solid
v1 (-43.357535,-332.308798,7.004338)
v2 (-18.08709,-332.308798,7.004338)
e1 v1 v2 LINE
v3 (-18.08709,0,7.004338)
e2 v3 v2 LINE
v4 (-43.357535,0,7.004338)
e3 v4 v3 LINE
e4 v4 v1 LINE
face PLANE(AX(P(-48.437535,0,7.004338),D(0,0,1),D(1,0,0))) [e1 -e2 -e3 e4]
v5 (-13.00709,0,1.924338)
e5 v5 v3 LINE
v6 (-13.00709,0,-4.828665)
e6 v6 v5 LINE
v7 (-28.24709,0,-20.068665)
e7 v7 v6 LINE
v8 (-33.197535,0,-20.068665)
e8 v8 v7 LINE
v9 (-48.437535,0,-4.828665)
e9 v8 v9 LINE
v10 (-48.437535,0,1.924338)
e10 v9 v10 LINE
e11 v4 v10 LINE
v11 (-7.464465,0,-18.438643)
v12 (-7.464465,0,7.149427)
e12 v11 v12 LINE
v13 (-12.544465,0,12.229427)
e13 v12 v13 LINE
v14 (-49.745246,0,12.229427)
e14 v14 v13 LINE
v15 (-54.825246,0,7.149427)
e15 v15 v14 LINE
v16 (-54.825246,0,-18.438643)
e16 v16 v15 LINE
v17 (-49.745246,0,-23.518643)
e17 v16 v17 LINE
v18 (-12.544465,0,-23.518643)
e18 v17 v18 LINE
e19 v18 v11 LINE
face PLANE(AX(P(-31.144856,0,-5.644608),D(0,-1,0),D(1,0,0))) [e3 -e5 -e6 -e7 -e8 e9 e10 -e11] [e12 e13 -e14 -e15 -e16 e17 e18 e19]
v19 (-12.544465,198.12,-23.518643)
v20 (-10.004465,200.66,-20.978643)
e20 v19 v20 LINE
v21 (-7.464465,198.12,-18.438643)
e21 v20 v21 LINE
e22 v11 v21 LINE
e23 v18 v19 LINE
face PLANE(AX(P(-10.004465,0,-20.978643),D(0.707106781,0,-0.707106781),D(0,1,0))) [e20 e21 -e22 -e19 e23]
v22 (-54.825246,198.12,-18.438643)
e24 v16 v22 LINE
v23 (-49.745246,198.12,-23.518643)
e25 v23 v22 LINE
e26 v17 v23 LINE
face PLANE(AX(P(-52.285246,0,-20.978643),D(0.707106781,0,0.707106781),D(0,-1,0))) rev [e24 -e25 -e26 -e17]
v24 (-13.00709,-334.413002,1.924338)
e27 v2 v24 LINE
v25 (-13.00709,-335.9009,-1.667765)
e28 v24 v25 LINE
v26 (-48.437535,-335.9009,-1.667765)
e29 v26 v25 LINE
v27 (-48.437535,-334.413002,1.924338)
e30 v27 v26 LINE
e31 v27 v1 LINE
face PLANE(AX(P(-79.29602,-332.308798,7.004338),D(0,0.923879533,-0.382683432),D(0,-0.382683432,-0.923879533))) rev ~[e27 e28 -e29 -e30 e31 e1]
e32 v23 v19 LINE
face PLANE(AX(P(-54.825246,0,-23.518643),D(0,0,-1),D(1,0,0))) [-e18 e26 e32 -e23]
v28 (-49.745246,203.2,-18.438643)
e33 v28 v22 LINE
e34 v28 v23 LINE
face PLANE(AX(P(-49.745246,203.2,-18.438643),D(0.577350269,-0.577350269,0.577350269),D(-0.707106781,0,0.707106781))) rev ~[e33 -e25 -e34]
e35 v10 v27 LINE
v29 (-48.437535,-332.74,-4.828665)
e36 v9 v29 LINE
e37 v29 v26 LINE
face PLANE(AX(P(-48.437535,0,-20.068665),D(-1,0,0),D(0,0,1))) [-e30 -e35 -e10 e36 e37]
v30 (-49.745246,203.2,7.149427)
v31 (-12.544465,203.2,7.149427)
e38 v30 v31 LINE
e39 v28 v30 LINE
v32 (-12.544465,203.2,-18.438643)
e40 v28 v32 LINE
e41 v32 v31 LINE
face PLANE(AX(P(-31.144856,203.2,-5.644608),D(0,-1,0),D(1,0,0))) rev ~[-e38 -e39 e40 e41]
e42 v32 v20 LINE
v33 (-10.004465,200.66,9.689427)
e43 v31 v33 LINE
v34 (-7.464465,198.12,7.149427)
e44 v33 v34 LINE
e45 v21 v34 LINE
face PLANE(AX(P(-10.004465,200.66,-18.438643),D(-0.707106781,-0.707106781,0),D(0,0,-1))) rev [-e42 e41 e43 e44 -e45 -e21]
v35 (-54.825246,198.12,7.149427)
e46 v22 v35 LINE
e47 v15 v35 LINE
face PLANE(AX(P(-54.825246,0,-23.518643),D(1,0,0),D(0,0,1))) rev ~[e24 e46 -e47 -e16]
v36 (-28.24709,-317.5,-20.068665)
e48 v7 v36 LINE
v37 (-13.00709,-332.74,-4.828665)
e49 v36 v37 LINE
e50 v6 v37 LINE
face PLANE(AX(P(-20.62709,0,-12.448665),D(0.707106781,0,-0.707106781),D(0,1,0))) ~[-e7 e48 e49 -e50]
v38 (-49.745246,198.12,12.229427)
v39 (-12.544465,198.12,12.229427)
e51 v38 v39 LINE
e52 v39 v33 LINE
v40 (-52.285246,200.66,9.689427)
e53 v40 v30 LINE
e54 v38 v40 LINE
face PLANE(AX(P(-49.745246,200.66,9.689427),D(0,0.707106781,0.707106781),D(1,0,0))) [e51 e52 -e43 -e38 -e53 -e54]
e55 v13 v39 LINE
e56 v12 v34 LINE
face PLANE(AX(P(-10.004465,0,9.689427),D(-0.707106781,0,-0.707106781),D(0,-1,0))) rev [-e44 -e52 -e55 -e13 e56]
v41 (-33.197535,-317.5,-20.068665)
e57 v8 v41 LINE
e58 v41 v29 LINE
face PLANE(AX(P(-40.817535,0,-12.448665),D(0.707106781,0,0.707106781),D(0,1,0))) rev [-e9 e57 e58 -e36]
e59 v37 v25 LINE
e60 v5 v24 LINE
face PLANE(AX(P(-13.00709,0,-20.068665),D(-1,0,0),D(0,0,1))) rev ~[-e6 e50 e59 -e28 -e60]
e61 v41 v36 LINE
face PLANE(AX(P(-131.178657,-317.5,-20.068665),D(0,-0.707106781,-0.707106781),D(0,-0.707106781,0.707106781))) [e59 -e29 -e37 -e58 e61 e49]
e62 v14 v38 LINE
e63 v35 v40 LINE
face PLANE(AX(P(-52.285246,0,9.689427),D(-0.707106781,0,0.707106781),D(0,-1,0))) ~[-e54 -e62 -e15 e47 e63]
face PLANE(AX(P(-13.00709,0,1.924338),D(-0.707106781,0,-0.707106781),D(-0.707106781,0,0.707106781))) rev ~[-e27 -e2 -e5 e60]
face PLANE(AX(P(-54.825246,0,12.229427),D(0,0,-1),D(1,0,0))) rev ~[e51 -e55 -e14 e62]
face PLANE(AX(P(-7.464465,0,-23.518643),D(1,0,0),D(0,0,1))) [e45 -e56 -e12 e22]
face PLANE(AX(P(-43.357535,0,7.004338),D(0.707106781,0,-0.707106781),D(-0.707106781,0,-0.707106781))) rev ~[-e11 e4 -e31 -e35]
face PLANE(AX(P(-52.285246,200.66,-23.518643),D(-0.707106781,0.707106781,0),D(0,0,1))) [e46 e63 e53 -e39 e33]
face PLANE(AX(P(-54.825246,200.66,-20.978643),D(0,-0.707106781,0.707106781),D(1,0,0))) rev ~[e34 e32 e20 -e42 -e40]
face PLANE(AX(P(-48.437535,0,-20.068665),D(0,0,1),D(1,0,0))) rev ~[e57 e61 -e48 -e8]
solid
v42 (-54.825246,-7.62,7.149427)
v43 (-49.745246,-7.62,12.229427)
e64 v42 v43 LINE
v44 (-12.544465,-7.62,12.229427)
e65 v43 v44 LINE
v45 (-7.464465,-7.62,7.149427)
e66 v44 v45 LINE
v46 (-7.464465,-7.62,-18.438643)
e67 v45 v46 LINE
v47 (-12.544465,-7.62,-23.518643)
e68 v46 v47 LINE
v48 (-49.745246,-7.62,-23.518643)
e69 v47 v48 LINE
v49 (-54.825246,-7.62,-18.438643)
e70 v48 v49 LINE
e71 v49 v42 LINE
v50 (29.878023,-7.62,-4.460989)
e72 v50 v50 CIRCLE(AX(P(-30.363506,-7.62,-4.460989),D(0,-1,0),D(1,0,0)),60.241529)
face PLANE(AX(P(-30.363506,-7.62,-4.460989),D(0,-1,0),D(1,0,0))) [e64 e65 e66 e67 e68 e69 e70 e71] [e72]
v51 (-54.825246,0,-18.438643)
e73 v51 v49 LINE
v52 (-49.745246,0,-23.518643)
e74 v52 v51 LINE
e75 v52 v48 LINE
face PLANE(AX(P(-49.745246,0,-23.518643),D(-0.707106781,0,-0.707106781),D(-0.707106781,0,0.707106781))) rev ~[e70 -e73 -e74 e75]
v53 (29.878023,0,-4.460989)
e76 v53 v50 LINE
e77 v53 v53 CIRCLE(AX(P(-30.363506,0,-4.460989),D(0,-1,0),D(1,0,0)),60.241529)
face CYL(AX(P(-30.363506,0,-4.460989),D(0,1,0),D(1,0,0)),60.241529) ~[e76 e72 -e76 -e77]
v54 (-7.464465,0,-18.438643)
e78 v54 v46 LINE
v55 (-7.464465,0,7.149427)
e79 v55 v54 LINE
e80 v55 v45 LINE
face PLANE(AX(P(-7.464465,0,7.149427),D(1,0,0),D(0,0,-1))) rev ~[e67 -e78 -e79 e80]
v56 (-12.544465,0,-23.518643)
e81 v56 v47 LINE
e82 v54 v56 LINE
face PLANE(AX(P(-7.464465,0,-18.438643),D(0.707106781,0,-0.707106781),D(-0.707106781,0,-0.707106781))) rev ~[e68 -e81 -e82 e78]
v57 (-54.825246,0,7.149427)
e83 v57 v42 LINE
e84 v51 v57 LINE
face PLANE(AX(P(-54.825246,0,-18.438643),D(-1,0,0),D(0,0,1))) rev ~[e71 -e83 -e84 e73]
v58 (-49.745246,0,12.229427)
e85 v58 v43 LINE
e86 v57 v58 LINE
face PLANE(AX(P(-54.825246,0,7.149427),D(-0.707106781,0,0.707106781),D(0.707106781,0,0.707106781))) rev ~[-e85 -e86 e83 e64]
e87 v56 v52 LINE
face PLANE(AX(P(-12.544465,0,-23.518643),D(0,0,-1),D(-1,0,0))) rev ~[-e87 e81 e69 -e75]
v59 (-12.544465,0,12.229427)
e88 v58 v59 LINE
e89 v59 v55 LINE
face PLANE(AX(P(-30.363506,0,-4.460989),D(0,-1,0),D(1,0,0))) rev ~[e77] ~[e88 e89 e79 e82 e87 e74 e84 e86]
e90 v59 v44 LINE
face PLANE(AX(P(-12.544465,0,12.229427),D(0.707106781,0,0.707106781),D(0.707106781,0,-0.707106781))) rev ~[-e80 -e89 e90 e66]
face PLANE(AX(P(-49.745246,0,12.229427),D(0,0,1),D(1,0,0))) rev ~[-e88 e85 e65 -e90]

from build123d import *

# Parameters (mm, degrees)
F0_W         = 47.3607815802
F0_H         = 35.7480701059
F1_DEPTH     = 203.2
F2_SIZE      = 5.08
F3_SIZE      = 5.08
F4_R         = 60.2415289401
F5_DEPTH     = 7.62
F6_W         = 35.4304444045
F6_H         = 27.0730024204
F7_DEPTH     = 355.6
F8_SIZE      = 15.24
F9_T1_DEPTH  = 200.9126880875
F10_T1_DEPTH = 357.6371519992
F10_T3_DEPTH = 97.1474137836


# Not quite as in the source:
# - a fillet or chamfer that OpenCascade refuses, or shapes differently, is made with other operations: its cross-section is extruded or revolved along the edge and cut away or added


with BuildPart() as f1:
    # F0 (on Front) → F1 (new body)
    with BuildSketch(Plane.XZ):
        with Locations((-31.144855544, -5.644608289)):
            Rectangle(F0_W, F0_H)
    extrude(amount=-F1_DEPTH)

    # F2
    f2_edges = [f1.edges().sort_by_distance(p)[0] for p in [
        (-7.464465, 101.6, 12.229427),
        (-54.825246, 101.6, 12.229427),
        (-7.464465, 101.6, -23.518643),
    ]]
    chamfer(f2_edges, length=F2_SIZE)

    # F3 (call 1 of 3: OpenCascade refuses the feature's edges together)
    f3_edges = [f1.edges().sort_by_distance(p)[0] for p in [
        (-54.825246, 101.6, -23.518643),
        (-33.684856, 203.2, -23.518643),
        (-54.825246, 203.2, -8.184608),
    ]]
    chamfer(f3_edges, length=F3_SIZE)

    # F3#2 (call 2 of 3)
    f3_2_edges = [f1.edges().sort_by_distance(p)[0] for p in [
        (-31.144856, 203.2, 12.229427),
    ]]
    chamfer(f3_2_edges, length=F3_SIZE)

    # F3#3 (call 3 of 3)
    f3_3_edges = [f1.edges().sort_by_distance(p)[0] for p in [
        (-7.464465, 203.2, -5.644608),
    ]]
    chamfer(f3_3_edges, length=F3_SIZE)

    # F6 (on face) → F7 (join)
    with BuildSketch(Plane.XZ):
        with Locations((-30.7223126292, -6.5321633592)):
            Rectangle(F6_W, F6_H)
    extrude(amount=F7_DEPTH)

    # F8
    f8_edges = [f1.edges().sort_by_distance(p)[0] for p in [
        (-48.437535, -177.8, -20.068665),
        (-13.00709, -177.8, -20.068665),
    ]]
    chamfer(f8_edges, length=F8_SIZE)

    # F9: chamfer of 38.1 on 1 edges, made by hand

    # F9_s2 → F9_t1 (cut)
    with BuildSketch(Plane.YZ.offset(-131.178656673)):
        Polygon((-317.5, -20.0686645694), (-355.6, 18.0313354306), (-355.6, -20.0686645694), align=None)
    extrude(amount=F9_T1_DEPTH, mode=Mode.SUBTRACT)

    # F10: chamfer of 5.08 on 3 edges, made by hand

    # F10_s2 → F10_t1 (cut)
    with BuildSketch(Plane.XZ):
        Polygon((-43.3575348315, 7.004337851), (-48.4375348315, 1.924337851), (-48.4375348315, 7.004337851), align=None)
        Polygon((-13.007090427, 1.924337851), (-18.087090427, 7.004337851), (-13.007090427, 7.004337851), align=None)
    extrude(amount=F10_T1_DEPTH, mode=Mode.SUBTRACT)

    # F10_s4 → F10_t3 (cut)
    with BuildSketch(Plane.YZ.offset(-79.296019521)):
        Polygon((-332.3087975235, 7.004337851), (-335.9008999719, -1.6677645975), (-344.5730024204, 7.004337851), align=None)
    extrude(amount=F10_T3_DEPTH, mode=Mode.SUBTRACT)


with BuildPart() as f5:
    # F4 (on face) → F5 (new body)
    with BuildSketch(Plane.XZ):
        with Locations((-30.3635057062, -4.4609890319)):
            Circle(F4_R)
        Polygon((-54.8252463341, -18.438643342), (-54.8252463341, 7.149426764), (-49.7452463341, 12.229426764), (-12.5444647539, 12.229426764), (-7.4644647539, 7.149426764), (-7.4644647539, -18.438643342), (-12.5444647539, -23.518643342), (-49.7452463341, -23.518643342), align=None, mode=Mode.SUBTRACT)
    extrude(amount=F5_DEPTH)


solid = Compound([f1.part, f5.part])
